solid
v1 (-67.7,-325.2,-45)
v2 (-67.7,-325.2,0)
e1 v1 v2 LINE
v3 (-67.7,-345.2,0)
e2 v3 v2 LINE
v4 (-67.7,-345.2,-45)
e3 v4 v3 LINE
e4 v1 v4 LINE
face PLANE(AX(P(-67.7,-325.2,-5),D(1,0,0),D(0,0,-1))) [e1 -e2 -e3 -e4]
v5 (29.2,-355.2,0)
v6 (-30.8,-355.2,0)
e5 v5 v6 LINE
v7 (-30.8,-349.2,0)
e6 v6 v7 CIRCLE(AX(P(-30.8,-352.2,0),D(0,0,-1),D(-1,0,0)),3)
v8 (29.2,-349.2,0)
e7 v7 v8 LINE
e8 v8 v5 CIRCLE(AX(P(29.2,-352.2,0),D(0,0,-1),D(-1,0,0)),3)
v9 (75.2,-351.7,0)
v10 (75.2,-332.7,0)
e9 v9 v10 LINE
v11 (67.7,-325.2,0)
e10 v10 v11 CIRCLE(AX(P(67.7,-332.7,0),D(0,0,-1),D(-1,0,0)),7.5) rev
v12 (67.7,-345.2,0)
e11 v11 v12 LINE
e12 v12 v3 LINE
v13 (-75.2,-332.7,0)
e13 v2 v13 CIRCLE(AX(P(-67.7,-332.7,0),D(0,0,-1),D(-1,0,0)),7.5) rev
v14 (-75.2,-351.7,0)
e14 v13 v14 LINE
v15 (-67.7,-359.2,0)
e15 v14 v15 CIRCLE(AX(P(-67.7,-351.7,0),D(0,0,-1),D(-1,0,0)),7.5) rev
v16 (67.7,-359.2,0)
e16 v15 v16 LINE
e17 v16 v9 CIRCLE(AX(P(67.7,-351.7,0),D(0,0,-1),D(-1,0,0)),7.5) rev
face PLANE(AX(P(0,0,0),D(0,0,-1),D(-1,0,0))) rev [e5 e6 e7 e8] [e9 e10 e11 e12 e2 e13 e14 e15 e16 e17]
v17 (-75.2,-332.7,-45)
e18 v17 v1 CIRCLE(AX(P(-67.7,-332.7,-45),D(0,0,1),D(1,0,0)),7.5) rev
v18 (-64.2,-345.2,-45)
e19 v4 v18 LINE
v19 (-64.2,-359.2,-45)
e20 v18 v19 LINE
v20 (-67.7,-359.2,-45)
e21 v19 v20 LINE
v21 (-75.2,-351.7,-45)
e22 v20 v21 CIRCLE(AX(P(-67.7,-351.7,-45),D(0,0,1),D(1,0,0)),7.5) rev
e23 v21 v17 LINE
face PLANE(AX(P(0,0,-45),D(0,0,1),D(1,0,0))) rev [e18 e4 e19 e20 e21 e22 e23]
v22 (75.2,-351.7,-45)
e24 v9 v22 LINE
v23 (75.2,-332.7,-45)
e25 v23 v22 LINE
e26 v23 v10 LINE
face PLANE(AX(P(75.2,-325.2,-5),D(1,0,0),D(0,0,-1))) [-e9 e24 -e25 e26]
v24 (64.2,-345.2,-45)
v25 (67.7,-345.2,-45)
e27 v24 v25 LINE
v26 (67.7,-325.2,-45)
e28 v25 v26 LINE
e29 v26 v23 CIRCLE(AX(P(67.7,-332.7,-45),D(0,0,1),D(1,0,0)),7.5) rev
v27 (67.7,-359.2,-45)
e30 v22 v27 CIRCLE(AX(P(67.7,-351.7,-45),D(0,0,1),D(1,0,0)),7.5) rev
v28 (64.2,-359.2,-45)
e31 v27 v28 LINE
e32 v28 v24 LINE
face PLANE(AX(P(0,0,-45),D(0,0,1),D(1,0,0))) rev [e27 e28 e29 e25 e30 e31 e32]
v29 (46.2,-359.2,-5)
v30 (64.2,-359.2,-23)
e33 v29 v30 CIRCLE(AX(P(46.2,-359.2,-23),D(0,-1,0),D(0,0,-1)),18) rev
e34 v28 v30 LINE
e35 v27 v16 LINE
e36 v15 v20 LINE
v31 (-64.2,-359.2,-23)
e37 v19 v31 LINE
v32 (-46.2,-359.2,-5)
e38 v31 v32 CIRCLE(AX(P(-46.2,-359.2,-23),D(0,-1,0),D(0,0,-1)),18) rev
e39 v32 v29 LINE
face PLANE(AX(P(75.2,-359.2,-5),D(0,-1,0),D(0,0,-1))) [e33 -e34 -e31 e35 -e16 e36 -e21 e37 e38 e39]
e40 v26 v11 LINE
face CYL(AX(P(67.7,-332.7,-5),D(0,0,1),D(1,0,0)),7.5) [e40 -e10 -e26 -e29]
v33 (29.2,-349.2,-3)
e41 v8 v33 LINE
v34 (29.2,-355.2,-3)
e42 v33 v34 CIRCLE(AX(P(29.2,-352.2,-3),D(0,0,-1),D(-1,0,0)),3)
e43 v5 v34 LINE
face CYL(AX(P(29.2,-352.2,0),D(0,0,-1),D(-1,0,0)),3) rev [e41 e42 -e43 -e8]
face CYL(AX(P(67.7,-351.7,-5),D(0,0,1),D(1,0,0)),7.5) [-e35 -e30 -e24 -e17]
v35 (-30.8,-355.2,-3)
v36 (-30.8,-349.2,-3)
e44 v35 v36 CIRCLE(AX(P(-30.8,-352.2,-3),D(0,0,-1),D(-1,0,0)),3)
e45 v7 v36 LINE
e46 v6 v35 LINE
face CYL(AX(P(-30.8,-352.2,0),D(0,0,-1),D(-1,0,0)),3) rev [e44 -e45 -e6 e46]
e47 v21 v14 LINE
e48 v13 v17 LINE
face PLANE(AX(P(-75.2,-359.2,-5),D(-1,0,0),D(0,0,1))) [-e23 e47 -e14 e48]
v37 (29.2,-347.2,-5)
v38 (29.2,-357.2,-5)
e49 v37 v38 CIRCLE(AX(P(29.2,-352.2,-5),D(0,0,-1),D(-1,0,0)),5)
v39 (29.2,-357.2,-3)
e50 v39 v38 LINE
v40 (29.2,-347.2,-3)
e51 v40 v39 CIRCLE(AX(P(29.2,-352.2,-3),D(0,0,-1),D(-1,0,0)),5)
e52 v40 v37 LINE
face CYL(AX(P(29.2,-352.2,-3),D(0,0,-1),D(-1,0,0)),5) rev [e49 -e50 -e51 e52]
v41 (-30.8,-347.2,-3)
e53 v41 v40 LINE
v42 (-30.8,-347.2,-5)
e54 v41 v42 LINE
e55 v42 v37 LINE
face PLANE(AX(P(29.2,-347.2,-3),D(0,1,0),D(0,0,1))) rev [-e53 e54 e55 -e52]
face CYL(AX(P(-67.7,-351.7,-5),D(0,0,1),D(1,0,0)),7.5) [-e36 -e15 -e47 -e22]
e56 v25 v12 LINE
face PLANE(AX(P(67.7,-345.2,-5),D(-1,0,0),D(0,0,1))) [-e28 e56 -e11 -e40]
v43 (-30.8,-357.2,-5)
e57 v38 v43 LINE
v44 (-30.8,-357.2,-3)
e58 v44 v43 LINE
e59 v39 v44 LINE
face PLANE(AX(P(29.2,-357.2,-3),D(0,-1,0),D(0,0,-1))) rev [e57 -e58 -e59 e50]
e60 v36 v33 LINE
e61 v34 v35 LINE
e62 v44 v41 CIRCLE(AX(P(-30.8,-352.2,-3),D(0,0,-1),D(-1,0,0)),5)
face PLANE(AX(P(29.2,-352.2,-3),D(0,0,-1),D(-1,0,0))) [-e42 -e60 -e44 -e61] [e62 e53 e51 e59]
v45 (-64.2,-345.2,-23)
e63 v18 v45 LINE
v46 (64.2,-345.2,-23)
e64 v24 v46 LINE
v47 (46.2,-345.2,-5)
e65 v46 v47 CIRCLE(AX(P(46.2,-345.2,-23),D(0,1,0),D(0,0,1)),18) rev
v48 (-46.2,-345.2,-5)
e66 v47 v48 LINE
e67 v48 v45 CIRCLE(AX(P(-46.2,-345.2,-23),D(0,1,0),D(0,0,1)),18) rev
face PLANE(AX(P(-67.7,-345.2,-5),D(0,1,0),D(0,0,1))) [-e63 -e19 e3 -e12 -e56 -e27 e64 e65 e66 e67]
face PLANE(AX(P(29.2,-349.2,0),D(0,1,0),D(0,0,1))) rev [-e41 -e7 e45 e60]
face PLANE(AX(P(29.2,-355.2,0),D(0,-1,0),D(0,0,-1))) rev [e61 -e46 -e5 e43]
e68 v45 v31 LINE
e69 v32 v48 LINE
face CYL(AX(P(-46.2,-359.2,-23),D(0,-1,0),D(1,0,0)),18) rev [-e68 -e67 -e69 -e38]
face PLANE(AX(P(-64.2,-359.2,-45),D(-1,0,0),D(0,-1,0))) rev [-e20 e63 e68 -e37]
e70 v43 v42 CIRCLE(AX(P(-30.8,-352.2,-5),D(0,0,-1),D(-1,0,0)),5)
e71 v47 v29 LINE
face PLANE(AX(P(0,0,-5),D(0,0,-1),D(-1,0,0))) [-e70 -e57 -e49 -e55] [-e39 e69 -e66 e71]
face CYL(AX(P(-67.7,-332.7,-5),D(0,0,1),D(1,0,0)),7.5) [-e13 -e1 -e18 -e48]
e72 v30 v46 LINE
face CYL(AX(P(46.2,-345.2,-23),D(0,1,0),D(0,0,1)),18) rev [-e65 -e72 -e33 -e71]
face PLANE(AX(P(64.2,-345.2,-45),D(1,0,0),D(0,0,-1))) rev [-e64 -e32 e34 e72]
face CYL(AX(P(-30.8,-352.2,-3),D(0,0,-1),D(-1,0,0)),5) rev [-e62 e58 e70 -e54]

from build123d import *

# Parameters (mm, degrees)
BOSS_EXTRUDE1_DEPTH = 5
BOSS_EXTRUDE2_DEPTH = 40
CUT_EXTRUDE1_DEPTH  = 2
CUT_EXTRUDE2_DEPTH  = 370.382836634
FILLET1_R           = 18
FILLET2_R           = 7.5


with BuildPart() as part:
    # Sketch1 → Boss-Extrude1 (new body)
    with BuildSketch(Plane.XY):
        Polygon((67.7, -325.2), (75.2, -325.2), (75.2, -359.2), (-75.2, -359.2), (-75.2, -325.2), (-67.7, -325.2), (-67.7, -345.2), (67.7, -345.2), align=None)
    extrude(amount=-BOSS_EXTRUDE1_DEPTH)

    # Sketch2 → Boss-Extrude2 (add)
    with BuildSketch(Plane(origin=(0, 0, -5), x_dir=(-1, 0, 0), z_dir=(0, 0, -1))):
        Polygon((67.7, -325.2), (75.2, -325.2), (75.2, -359.2), (64.2, -359.2), (64.2, -345.2), (67.7, -345.2), align=None)
        Polygon((-75.2, -359.2), (-75.2, -325.2), (-67.7, -325.2), (-67.7, -345.2), (-64.2, -345.2), (-64.2, -359.2), align=None)
    extrude(amount=BOSS_EXTRUDE2_DEPTH)

    # Sketch3 → Cut-Extrude1 (cut)
    with BuildSketch(Plane(origin=(0, 0, -5), x_dir=(-1, 0, 0), z_dir=(0, 0, -1))):
        with BuildLine():
            Line((-29.2, -347.2), (30.8, -347.2))
            ThreePointArc((30.8, -347.2), (35.8, -352.2), (30.8, -357.2))
            Line((30.8, -357.2), (-29.2, -357.2))
            ThreePointArc((-29.2, -357.2), (-34.2, -352.2), (-29.2, -347.2))
        make_face()
    extrude(amount=-CUT_EXTRUDE1_DEPTH, mode=Mode.SUBTRACT)

    # Sketch4 → Cut-Extrude2 (cut, through all)
    with BuildSketch(Plane(origin=(0, 0, -3), x_dir=(-1, 0, 0), z_dir=(0, 0, -1))):
        with BuildLine():
            Line((-29.2, -349.2), (30.8, -349.2))
            ThreePointArc((30.8, -349.2), (33.8, -352.2), (30.8, -355.2))
            Line((30.8, -355.2), (-29.2, -355.2))
            ThreePointArc((-29.2, -355.2), (-32.2, -352.2), (-29.2, -349.2))
        make_face()
    extrude(amount=-CUT_EXTRUDE2_DEPTH, mode=Mode.SUBTRACT)

    # Fillet1
    fillet1_edges = [part.edges().sort_by_distance(p)[0] for p in [
        (-64.2, -352.2, -5),
        (64.2, -352.2, -5),
    ]]
    fillet(fillet1_edges, radius=FILLET1_R)

    # Fillet2
    fillet2_edges = [part.edges().sort_by_distance(p)[0] for p in [
        (75.2, -325.2, -22.5),
        (-75.2, -325.2, -22.5),
        (-75.2, -359.2, -22.5),
        (75.2, -359.2, -22.5),
    ]]
    fillet(fillet2_edges, radius=FILLET2_R - 0.0001)  # a hair under: the kernel refuses the full size


solid = part.part
